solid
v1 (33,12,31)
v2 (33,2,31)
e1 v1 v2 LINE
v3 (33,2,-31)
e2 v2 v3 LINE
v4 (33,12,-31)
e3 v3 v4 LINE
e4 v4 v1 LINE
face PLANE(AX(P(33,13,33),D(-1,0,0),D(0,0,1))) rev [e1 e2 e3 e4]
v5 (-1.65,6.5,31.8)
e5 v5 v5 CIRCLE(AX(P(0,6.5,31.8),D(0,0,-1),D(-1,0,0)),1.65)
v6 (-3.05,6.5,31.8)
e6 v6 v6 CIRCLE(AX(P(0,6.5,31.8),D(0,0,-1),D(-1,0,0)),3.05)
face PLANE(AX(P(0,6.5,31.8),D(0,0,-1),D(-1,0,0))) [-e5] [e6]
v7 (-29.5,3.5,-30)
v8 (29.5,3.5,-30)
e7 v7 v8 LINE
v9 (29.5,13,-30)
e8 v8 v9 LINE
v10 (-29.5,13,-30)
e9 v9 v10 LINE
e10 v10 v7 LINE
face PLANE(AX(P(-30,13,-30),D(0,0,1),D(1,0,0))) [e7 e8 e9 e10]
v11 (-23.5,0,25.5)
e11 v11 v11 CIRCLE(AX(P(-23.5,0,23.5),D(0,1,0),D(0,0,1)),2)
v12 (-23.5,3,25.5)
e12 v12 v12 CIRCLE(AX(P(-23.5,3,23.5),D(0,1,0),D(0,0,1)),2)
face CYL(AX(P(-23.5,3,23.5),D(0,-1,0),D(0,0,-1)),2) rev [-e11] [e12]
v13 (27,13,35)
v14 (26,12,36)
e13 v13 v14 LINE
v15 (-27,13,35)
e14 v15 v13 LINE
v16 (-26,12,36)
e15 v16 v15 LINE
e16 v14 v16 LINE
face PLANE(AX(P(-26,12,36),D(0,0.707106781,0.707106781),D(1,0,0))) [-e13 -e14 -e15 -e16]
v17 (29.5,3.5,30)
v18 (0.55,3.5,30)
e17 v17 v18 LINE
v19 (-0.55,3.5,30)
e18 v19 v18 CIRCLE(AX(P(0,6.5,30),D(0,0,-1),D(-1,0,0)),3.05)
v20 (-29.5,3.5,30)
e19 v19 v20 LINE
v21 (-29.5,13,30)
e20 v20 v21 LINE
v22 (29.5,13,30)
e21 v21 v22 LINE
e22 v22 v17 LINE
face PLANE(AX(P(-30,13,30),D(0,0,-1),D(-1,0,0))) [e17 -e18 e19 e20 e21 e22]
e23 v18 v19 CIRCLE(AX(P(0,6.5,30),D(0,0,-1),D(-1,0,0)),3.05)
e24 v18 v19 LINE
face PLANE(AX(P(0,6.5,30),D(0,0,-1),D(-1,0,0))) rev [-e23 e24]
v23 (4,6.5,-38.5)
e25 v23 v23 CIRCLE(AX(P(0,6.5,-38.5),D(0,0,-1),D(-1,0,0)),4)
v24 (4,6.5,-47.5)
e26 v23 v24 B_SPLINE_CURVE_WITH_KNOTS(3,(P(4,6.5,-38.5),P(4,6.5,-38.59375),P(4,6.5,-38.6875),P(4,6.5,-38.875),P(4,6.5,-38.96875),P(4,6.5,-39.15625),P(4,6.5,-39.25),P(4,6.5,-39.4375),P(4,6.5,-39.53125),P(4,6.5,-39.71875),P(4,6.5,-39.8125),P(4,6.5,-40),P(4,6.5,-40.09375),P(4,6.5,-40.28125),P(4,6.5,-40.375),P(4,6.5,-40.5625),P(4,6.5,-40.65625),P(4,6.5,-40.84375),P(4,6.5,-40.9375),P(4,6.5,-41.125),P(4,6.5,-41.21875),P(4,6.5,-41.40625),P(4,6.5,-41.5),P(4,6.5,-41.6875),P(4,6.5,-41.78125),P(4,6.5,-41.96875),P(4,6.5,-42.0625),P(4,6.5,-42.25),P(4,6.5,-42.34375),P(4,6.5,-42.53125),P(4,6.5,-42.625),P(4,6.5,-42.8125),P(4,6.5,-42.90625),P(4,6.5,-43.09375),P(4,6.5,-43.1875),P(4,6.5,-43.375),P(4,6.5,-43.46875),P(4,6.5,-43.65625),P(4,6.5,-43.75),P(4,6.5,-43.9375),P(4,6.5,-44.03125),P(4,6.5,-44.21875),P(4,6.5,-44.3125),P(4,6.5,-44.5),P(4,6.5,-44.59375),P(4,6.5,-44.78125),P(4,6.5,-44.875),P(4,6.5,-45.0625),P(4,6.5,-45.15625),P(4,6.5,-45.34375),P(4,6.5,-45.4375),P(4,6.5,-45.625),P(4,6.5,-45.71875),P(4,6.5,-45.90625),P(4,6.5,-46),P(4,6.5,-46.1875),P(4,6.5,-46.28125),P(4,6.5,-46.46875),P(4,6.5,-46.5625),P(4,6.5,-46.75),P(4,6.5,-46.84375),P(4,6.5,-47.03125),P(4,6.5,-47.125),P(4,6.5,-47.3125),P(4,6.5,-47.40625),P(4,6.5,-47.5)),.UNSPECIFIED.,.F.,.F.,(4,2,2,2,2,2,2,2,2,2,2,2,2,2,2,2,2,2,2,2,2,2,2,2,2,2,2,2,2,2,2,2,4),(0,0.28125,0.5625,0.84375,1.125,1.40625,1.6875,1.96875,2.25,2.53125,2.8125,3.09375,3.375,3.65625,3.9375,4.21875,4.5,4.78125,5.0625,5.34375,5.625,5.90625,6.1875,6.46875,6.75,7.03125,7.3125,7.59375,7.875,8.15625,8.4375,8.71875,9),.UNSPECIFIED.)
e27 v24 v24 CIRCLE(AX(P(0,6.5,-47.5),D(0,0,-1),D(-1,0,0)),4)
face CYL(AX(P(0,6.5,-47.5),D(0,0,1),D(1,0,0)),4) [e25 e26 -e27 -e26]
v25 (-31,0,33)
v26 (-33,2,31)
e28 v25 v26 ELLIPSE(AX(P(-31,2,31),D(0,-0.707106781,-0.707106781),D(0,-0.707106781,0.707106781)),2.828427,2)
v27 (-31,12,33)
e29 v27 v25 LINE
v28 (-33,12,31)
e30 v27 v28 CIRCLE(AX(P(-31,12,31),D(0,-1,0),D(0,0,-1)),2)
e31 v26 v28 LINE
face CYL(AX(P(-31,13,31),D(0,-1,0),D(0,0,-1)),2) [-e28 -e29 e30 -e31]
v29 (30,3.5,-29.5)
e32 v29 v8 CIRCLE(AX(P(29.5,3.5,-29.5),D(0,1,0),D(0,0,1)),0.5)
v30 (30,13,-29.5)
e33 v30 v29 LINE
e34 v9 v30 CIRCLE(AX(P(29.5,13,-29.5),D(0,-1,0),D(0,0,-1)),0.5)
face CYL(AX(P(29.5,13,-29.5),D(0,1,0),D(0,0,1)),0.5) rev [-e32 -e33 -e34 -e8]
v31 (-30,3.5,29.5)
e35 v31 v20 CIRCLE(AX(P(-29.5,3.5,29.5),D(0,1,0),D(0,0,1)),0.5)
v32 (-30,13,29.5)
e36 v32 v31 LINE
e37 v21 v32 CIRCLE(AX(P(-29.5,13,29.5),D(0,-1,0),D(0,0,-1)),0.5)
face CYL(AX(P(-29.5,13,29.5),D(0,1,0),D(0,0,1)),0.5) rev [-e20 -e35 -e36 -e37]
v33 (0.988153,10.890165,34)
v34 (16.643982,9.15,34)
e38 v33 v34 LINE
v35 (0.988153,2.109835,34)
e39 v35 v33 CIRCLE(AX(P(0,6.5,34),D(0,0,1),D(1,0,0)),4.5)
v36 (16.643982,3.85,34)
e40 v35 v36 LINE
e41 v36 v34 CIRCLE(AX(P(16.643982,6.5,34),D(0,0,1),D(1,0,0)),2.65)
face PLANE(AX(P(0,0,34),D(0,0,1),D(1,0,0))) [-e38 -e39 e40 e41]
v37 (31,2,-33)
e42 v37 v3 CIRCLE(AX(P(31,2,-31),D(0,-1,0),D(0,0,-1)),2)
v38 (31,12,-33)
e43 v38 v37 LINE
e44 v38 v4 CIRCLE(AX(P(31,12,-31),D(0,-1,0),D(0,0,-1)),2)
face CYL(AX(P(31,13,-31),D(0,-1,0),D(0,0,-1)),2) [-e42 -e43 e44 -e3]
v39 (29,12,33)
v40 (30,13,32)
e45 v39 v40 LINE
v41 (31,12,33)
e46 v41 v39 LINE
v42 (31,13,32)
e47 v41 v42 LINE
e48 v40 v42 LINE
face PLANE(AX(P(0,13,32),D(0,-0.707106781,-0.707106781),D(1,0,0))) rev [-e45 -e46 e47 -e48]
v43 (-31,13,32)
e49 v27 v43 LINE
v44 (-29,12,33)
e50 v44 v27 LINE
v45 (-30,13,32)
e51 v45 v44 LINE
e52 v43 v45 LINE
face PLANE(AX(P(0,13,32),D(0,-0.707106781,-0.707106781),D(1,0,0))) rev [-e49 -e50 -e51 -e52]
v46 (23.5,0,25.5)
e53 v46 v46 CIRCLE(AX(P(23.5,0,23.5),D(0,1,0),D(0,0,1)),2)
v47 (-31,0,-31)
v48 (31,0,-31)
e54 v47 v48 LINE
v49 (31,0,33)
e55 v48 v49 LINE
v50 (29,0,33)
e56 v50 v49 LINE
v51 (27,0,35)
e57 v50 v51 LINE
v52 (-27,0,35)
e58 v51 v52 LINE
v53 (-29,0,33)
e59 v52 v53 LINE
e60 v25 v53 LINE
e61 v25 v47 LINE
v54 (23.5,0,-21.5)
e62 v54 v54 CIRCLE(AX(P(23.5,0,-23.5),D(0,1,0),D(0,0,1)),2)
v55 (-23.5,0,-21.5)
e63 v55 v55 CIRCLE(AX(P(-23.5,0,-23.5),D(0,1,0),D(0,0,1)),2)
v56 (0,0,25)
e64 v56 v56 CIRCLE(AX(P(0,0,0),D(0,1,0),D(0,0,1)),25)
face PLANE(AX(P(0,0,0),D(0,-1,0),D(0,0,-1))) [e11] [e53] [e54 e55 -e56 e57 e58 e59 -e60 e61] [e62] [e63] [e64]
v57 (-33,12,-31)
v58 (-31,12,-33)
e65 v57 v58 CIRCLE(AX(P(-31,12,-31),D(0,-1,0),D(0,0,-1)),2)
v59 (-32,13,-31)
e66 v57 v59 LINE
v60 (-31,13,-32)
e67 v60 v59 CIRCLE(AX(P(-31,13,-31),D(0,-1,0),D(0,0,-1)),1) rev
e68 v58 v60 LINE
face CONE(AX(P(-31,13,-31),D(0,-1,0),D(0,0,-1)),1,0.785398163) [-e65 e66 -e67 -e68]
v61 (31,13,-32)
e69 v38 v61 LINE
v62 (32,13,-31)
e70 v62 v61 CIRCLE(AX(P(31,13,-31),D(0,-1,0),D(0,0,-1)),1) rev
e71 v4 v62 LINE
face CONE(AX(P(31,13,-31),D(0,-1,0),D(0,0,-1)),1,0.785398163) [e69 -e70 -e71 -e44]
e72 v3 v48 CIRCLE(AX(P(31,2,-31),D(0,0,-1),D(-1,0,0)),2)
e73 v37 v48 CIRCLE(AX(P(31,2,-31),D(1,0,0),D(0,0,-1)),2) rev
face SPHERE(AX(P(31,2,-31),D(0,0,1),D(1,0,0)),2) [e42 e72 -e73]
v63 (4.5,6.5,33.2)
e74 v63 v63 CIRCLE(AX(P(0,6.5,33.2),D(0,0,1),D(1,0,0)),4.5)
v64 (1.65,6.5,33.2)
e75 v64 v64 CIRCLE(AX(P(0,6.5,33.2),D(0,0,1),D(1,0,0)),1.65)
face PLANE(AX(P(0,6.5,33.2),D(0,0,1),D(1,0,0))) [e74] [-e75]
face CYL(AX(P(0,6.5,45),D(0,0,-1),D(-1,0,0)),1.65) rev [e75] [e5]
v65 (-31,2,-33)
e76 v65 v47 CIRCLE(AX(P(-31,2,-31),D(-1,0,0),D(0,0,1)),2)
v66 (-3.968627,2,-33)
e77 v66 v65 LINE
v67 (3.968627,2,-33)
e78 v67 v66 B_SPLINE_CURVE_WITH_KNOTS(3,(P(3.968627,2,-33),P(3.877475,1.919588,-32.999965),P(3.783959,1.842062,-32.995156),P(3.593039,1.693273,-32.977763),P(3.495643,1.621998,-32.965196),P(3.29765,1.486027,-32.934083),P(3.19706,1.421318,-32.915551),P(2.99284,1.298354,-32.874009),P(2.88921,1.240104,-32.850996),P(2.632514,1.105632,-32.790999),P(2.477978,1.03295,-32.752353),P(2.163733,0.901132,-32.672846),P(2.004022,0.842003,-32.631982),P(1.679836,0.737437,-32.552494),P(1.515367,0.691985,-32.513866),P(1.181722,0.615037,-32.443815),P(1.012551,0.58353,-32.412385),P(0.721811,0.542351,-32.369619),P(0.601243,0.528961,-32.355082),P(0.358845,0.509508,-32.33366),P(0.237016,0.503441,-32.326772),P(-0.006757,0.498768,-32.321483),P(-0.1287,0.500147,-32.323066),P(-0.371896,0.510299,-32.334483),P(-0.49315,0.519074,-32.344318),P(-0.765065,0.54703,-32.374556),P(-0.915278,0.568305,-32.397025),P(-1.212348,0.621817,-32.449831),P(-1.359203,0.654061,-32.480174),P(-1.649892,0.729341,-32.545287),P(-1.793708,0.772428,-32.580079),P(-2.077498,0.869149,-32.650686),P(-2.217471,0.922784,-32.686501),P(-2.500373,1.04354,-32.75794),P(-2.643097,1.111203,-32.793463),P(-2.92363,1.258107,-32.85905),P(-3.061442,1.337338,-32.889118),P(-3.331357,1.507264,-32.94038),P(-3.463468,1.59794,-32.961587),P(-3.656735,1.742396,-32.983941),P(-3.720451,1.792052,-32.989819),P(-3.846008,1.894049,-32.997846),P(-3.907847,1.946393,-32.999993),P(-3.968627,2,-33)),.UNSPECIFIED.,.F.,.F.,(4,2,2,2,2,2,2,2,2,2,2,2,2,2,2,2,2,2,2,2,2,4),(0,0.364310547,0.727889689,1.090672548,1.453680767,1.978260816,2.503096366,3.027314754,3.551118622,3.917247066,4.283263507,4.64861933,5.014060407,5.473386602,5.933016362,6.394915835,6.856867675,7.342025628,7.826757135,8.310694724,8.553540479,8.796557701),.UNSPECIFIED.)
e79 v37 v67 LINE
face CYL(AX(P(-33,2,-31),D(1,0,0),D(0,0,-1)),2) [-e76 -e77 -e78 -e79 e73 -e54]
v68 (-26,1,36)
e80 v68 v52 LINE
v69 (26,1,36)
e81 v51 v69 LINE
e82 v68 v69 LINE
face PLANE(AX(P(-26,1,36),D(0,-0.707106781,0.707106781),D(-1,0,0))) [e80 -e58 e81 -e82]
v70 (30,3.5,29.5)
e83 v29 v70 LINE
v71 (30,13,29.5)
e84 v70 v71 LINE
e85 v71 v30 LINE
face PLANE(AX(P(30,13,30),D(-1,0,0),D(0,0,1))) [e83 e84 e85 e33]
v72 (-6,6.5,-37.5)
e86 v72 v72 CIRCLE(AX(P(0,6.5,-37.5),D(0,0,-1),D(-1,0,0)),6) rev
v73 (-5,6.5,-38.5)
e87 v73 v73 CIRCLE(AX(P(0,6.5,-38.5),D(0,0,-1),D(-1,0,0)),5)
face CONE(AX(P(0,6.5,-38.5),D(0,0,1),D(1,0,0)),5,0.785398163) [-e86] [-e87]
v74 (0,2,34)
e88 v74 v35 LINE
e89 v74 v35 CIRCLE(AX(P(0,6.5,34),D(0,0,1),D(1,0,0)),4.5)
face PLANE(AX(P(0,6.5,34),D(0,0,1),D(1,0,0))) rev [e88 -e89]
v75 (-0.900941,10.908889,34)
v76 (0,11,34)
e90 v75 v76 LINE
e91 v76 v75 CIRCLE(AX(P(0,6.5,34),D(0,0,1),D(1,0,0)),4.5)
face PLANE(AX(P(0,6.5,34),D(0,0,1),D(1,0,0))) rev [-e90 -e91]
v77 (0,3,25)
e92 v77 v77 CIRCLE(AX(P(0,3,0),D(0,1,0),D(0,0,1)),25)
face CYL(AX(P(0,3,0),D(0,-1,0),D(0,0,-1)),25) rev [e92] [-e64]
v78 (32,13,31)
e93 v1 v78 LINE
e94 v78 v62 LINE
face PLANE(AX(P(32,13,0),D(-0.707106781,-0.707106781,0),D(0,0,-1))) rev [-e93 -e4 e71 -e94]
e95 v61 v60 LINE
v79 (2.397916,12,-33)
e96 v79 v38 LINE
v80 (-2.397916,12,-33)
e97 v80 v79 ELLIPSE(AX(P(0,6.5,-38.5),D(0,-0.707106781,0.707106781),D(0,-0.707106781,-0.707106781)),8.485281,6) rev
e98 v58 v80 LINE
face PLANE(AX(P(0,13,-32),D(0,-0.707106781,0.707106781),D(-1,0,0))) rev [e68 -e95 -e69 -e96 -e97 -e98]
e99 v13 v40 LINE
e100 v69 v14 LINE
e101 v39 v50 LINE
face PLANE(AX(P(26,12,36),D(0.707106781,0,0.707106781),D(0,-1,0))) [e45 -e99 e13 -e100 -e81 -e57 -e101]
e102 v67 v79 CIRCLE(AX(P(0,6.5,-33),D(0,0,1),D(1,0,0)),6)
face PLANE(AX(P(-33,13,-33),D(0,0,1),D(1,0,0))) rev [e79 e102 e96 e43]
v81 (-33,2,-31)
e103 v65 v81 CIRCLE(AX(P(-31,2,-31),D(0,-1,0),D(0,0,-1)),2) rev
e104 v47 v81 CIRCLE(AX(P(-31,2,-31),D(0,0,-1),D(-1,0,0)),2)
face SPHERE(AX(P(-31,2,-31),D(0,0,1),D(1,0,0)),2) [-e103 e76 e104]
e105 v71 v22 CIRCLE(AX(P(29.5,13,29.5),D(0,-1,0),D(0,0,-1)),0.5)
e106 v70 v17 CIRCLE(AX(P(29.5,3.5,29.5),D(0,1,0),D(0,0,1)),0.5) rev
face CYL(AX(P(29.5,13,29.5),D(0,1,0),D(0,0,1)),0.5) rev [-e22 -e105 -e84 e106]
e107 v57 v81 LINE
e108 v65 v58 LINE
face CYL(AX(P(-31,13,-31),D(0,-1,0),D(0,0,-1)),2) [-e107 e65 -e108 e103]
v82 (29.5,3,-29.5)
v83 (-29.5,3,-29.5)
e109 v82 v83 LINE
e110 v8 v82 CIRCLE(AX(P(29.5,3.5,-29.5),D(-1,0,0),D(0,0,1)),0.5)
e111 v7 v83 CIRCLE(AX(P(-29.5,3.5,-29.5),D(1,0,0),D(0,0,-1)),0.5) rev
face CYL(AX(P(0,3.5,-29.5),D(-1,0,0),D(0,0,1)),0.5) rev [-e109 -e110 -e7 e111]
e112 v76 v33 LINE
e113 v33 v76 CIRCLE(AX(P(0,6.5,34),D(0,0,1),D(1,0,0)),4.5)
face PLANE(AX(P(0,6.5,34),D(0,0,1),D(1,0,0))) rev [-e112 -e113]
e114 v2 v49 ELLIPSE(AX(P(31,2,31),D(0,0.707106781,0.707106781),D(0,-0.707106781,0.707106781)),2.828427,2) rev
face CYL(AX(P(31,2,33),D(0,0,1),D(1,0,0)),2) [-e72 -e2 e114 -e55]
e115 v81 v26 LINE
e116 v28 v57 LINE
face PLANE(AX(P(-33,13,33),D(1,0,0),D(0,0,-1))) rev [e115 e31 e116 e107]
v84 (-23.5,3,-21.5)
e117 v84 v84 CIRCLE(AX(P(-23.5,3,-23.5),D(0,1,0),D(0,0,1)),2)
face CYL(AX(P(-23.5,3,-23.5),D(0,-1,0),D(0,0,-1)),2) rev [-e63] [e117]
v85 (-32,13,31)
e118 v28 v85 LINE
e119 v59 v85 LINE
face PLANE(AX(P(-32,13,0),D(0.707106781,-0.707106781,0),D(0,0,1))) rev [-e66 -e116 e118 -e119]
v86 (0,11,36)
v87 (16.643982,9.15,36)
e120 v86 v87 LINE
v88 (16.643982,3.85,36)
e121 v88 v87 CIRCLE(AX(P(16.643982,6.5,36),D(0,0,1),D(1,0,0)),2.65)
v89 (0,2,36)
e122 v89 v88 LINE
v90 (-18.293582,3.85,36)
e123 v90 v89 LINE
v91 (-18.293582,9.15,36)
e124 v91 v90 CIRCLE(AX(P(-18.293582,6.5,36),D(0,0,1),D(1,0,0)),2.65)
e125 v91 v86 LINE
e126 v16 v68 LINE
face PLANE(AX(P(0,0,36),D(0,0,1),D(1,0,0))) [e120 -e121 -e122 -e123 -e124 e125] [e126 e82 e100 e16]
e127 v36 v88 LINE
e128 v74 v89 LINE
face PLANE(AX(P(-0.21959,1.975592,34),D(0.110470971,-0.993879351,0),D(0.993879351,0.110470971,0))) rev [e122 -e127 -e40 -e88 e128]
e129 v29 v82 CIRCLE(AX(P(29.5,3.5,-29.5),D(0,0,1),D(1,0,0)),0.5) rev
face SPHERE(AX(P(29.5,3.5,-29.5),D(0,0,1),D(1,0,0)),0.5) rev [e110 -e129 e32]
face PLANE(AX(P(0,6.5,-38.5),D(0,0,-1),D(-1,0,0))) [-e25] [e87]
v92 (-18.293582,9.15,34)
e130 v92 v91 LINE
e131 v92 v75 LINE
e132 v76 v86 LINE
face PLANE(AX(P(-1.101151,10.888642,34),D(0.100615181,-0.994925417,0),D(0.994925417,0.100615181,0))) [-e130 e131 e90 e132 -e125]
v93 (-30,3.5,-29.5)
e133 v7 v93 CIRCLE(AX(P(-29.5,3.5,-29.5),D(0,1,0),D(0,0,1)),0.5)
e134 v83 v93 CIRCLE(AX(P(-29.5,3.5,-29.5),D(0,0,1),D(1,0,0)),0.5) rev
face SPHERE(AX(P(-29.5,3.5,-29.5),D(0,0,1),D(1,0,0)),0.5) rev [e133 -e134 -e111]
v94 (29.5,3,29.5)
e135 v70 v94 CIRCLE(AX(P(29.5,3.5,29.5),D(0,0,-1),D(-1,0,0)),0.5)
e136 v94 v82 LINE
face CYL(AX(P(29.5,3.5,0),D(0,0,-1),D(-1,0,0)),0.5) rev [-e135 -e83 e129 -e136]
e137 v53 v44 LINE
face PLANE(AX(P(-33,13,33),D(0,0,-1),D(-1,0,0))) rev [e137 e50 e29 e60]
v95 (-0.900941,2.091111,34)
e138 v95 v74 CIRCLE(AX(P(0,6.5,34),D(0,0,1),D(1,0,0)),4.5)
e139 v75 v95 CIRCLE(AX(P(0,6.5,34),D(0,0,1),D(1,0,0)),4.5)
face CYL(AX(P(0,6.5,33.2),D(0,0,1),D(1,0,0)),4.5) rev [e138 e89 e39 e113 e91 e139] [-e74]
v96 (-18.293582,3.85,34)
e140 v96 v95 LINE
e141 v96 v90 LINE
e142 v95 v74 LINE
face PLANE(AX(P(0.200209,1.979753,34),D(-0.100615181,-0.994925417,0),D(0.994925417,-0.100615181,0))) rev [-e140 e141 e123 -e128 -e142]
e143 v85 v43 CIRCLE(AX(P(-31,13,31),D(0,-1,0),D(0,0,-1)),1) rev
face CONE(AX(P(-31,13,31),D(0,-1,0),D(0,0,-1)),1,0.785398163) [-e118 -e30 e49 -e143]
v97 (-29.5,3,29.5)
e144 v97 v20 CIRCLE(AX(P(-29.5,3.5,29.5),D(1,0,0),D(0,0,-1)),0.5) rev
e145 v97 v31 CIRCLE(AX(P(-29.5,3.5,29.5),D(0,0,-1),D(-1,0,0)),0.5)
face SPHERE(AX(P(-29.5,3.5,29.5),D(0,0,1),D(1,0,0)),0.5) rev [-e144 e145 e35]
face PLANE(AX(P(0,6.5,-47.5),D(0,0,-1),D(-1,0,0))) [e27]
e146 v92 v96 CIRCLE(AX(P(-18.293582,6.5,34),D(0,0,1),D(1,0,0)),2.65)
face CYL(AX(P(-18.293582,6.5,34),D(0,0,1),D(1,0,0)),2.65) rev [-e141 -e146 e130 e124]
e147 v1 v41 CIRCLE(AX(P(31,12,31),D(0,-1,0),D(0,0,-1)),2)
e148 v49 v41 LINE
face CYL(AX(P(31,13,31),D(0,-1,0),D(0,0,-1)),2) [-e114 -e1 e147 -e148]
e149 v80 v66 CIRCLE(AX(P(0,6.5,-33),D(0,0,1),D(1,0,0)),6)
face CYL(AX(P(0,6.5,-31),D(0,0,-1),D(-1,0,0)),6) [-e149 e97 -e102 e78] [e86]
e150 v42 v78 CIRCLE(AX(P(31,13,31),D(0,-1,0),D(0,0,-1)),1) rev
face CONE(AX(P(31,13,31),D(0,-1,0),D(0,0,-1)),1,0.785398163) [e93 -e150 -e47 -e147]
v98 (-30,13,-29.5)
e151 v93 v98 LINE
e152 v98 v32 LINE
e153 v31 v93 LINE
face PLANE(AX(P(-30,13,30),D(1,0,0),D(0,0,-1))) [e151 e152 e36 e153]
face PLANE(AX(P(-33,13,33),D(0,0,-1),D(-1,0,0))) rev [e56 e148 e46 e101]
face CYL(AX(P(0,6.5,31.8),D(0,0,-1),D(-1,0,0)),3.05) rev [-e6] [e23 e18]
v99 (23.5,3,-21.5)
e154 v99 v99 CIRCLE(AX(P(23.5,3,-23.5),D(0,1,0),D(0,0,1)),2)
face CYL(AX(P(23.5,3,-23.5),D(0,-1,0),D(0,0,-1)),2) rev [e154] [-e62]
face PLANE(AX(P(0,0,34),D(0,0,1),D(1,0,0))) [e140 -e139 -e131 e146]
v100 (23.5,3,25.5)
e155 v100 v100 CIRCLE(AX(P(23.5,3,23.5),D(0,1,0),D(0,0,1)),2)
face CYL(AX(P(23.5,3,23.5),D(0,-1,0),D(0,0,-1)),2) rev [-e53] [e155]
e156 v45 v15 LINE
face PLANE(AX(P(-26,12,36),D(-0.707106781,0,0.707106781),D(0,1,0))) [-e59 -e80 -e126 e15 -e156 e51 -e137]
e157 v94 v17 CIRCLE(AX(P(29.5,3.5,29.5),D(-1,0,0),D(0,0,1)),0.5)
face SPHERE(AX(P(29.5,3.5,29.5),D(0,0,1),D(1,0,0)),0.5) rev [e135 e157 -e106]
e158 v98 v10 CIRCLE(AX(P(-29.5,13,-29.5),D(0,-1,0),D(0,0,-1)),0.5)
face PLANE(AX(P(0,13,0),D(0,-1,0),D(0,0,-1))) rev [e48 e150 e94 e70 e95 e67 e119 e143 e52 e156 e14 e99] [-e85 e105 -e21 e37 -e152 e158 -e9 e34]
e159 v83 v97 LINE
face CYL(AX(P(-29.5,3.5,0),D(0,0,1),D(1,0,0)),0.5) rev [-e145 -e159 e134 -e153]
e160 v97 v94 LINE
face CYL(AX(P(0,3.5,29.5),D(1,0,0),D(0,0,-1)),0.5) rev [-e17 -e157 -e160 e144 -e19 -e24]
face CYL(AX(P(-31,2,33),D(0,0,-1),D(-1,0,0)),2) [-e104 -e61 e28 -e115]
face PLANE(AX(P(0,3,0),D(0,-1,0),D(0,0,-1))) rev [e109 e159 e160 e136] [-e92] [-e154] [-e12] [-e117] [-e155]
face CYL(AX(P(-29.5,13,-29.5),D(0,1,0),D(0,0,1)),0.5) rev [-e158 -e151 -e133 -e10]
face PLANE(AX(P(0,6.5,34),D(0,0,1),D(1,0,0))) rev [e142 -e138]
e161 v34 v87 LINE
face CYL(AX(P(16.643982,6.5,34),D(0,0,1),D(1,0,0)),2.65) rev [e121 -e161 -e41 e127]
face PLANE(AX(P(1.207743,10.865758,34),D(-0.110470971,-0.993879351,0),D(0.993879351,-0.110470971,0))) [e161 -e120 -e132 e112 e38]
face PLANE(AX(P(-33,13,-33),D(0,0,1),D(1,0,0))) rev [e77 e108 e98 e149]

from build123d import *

# Parameters (mm, degrees)
SKETCH1_W                = 66
SKETCH1_H                = 66
SKETCH1_W_2              = 60
SKETCH1_H_2              = 60
BOSS_EXTRUDE1_DEPTH      = 13
SKETCH2_W                = 60
SKETCH2_H                = 60
SKETCH2_R                = 25
SKETCH2_R_2              = 2
BOSS_EXTRUDE2_DEPTH      = 3
FILLET1_R                = 0.5
FILLET2_R                = 2
SKETCH12_W               = 52
SKETCH12_H               = 11
BOSS_EXTRUDE3_DEPTH      = 3
CHAMFER1_SIZE            = 3
CUT_EXTRUDE4_DEPTH       = 12
CUT_EXTRUDE4_DEPTH_BACK  = 12
SKETCH10_R               = 1.65
SKETCH13_R               = 3.05
CUT_EXTRUDE6_DEPTH       = 1.8
SKETCH14_R               = 4
BOSS_EXTRUDE4_DEPTH      = 14.5
BOSS_EXTRUDE5_DEPTH      = 5.5
BOSS_EXTRUDE5_DEPTH_BACK = 2
SKETCH15_R               = 6
CHAMFER2_SIZE            = 1
CHAMFER3_SIZE            = 1
SKETCH17_R               = 2.65
SKETCH17_R_2             = 1.65
CUT_EXTRUDE8_DEPTH       = 2
SKETCH18_R               = 4.5
CUT_EXTRUDE9_DEPTH       = 0.8


with BuildPart() as part:
    # Sketch1 → Boss-Extrude1 (new body)
    with BuildSketch(Plane(origin=(0, 0, 0), x_dir=(1, 0, 0), z_dir=(0, 1, 0))):
        Rectangle(SKETCH1_W, SKETCH1_H)
        Rectangle(SKETCH1_W_2, SKETCH1_H_2, mode=Mode.SUBTRACT)
    extrude(amount=BOSS_EXTRUDE1_DEPTH)

    # Sketch2 → Boss-Extrude2 (add)
    with BuildSketch(Plane(origin=(0, 0, 0), x_dir=(1, 0, 0), z_dir=(0, 1, 0))):
        Rectangle(SKETCH2_W, SKETCH2_H)
        with Locations(Location((0, 0, 0), (0, 0, 270))):
            Circle(SKETCH2_R, mode=Mode.SUBTRACT)
        with Locations(Location((-23.5, 23.5, 0), (0, 0, 270))):
            Circle(SKETCH2_R_2, mode=Mode.SUBTRACT)
        with Locations(Location((23.5, 23.5, 0), (0, 0, 270))):
            Circle(SKETCH2_R_2, mode=Mode.SUBTRACT)
        with Locations(Location((23.5, -23.5, 0), (0, 0, 270))):
            Circle(SKETCH2_R_2, mode=Mode.SUBTRACT)
        with Locations(Location((-23.5, -23.5, 0), (0, 0, 270))):
            Circle(SKETCH2_R_2, mode=Mode.SUBTRACT)
    extrude(amount=BOSS_EXTRUDE2_DEPTH)

    # Fillet1
    fillet1_edges = [part.edges().sort_by_distance(p)[0] for p in [
        (-30, 8, -30),
        (-30, 8, 30),
        (30, 8, 30),
        (30, 8, -30),
        (-30, 3, 0),
        (0, 3, 30),
        (30, 3, 0),
        (0, 3, -30),
    ]]
    fillet(fillet1_edges, radius=FILLET1_R)

    # Fillet2
    fillet2_edges = [part.edges().sort_by_distance(p)[0] for p in [
        (0, 0, -33),
        (33, 0, 0),
        (-33, 0, 0),
        (-33, 6.5, -33),
        (33, 6.5, -33),
        (33, 6.5, 33),
        (-33, 6.5, 33),
    ]]
    fillet(fillet2_edges, radius=FILLET2_R)

    # Sketch12 → Boss-Extrude3 (add)
    with BuildSketch(Plane.XY.offset(33)):
        with Locations((0, 6.5)):
            Rectangle(SKETCH12_W, SKETCH12_H)
    extrude(amount=BOSS_EXTRUDE3_DEPTH)

    # Chamfer1
    # the kernel refuses this chamfer: 3 mm, written as the material it adds along each edge
    with BuildSketch(Plane(origin=(26, 1, 33), x_dir=(0, -0.9996219169112968, -0.027495876610586775), z_dir=(-1, 0, 0))) as chamfer1_piece_1_section:
        Polygon((CHAMFER1_SIZE * 0.999621916911, CHAMFER1_SIZE * 0.0274958766106), (-CHAMFER1_SIZE * 0.0274958766106, CHAMFER1_SIZE * 0.999621916911), (0, 0), align=None)
    chamfer1_piece_1 = extrude(amount=52, mode=Mode.PRIVATE)
    chamfer1_piece_1 = split(chamfer1_piece_1, bisect_by=Plane(origin=(0, 0, 34.280814641), z_dir=(0, 1, 0)), keep=Keep.TOP, mode=Mode.PRIVATE)
    chamfer1_piece_1 = split(chamfer1_piece_1, bisect_by=Plane(origin=(0, 0.572987798, 36), z_dir=(0, 0, -1)), keep=Keep.TOP, mode=Mode.PRIVATE)
    add(chamfer1_piece_1)
    with BuildSketch(Plane(origin=(26, 12, 33), x_dir=(0.9996219169112965, 0, -0.02749587661058676), z_dir=(0, -1, 0))) as chamfer1_piece_2_section:
        Polygon((CHAMFER1_SIZE * 0.999621916911, CHAMFER1_SIZE * 0.0274958766106), (-CHAMFER1_SIZE * 0.0274958766106, CHAMFER1_SIZE * 0.999621916911), (0, 0), align=None)
    chamfer1_piece_2 = extrude(amount=11, mode=Mode.PRIVATE)
    chamfer1_piece_2 = split(chamfer1_piece_2, bisect_by=Plane(origin=(26.991212463, 6.5, 36), z_dir=(0, 0, -1)), keep=Keep.TOP, mode=Mode.PRIVATE)
    add(chamfer1_piece_2)
    with BuildSketch(Plane(origin=(-26, 12, 33), x_dir=(0, 0.9996219169112968, -0.02749587661058678), z_dir=(1, 0, 0))) as chamfer1_piece_3_section:
        Polygon((CHAMFER1_SIZE * 0.999621916911, CHAMFER1_SIZE * 0.0274958766106), (-CHAMFER1_SIZE * 0.0274958766106, CHAMFER1_SIZE * 0.999621916911), (0, 0), align=None)
    chamfer1_piece_3 = extrude(amount=52, mode=Mode.PRIVATE)
    chamfer1_piece_3 = split(chamfer1_piece_3, bisect_by=Plane(origin=(0, 13, 34.280814641), z_dir=(0, -1, 0)), keep=Keep.TOP, mode=Mode.PRIVATE)
    chamfer1_piece_3 = split(chamfer1_piece_3, bisect_by=Plane(origin=(0, 12.427012202, 36), z_dir=(0, 0, -1)), keep=Keep.TOP, mode=Mode.PRIVATE)
    add(chamfer1_piece_3)
    with BuildSketch(Plane(origin=(-26, 1, 33), x_dir=(-0.9996219169112965, 0, -0.02749587661058676), z_dir=(0, 1, 0))) as chamfer1_piece_4_section:
        Polygon((CHAMFER1_SIZE * 0.999621916911, CHAMFER1_SIZE * 0.0274958766106), (-CHAMFER1_SIZE * 0.0274958766106, CHAMFER1_SIZE * 0.999621916911), (0, 0), align=None)
    chamfer1_piece_4 = extrude(amount=11, mode=Mode.PRIVATE)
    chamfer1_piece_4 = split(chamfer1_piece_4, bisect_by=Plane(origin=(-26.991212463, 6.5, 36), z_dir=(0, 0, -1)), keep=Keep.TOP, mode=Mode.PRIVATE)
    add(chamfer1_piece_4)
    with BuildSketch(Plane(origin=(26, 12, 33), x_dir=(0.9996219169112965, 0, -0.02749587661058676), z_dir=(0, -1, 0))) as chamfer1_piece_5a_section:
        Polygon((CHAMFER1_SIZE * 0.999621916911, CHAMFER1_SIZE * 0.0274958766106), (-CHAMFER1_SIZE * 0.0274958766106, CHAMFER1_SIZE * 0.999621916911), (0, 0), align=None)
    chamfer1_piece_5a = extrude(amount=18.715048964, mode=Mode.PRIVATE)
    chamfer1_piece_5a = split(chamfer1_piece_5a, bisect_by=Plane(origin=(26.991212463, 0, 33.985903001), z_dir=(0, 1, 0)), keep=Keep.TOP, mode=Mode.PRIVATE)
    chamfer1_piece_5a = split(chamfer1_piece_5a, bisect_by=Plane(origin=(26.991212463, 1, 33.985903001), z_dir=(0, -1, 0)), keep=Keep.TOP, mode=Mode.PRIVATE)
    chamfer1_piece_5a = split(chamfer1_piece_5a, bisect_by=Plane(origin=(26.991212463, 0.5, 36), z_dir=(0, 0, -1)), keep=Keep.TOP, mode=Mode.PRIVATE)
    with BuildSketch(Plane(origin=(33.715048964, 1, 33), x_dir=(0, -0.9996219169112968, -0.027495876610586775), z_dir=(-1, 0, 0))) as chamfer1_piece_5b_section:
        Polygon((CHAMFER1_SIZE * 0.999621916911, CHAMFER1_SIZE * 0.0274958766106), (-CHAMFER1_SIZE * 0.0274958766106, CHAMFER1_SIZE * 0.999621916911), (0, 0), align=None)
    chamfer1_piece_5b = extrude(amount=59.715048964, mode=Mode.PRIVATE)
    chamfer1_piece_5b = split(chamfer1_piece_5b, bisect_by=Plane(origin=(29.857524482, 0, 34.280814641), z_dir=(0, 1, 0)), keep=Keep.TOP, mode=Mode.PRIVATE)
    chamfer1_piece_5b = split(chamfer1_piece_5b, bisect_by=Plane(origin=(26, 0.572987798, 34.280814641), z_dir=(1, 0, 0)), keep=Keep.TOP, mode=Mode.PRIVATE)
    chamfer1_piece_5b = split(chamfer1_piece_5b, bisect_by=Plane(origin=(29.857524482, 0.572987798, 36), z_dir=(0, 0, -1)), keep=Keep.TOP, mode=Mode.PRIVATE)
    chamfer1_piece_5 = chamfer1_piece_5a & chamfer1_piece_5b
    add(chamfer1_piece_5)
    with BuildSketch(Plane(origin=(26, 1, 33), x_dir=(0, -0.9996219169112968, -0.027495876610586775), z_dir=(-1, 0, 0))) as chamfer1_piece_6a_section:
        Polygon((CHAMFER1_SIZE * 0.999621916911, CHAMFER1_SIZE * 0.0274958766106), (-CHAMFER1_SIZE * 0.0274958766106, CHAMFER1_SIZE * 0.999621916911), (0, 0), align=None)
    chamfer1_piece_6a = extrude(amount=59.715048964, mode=Mode.PRIVATE)
    chamfer1_piece_6a = split(chamfer1_piece_6a, bisect_by=Plane(origin=(-29.857524482, 0, 34.280814641), z_dir=(0, 1, 0)), keep=Keep.TOP, mode=Mode.PRIVATE)
    chamfer1_piece_6a = split(chamfer1_piece_6a, bisect_by=Plane(origin=(-26, 0.572987798, 34.280814641), z_dir=(-1, 0, 0)), keep=Keep.TOP, mode=Mode.PRIVATE)
    chamfer1_piece_6a = split(chamfer1_piece_6a, bisect_by=Plane(origin=(-29.857524482, 0.572987798, 36), z_dir=(0, 0, -1)), keep=Keep.TOP, mode=Mode.PRIVATE)
    with BuildSketch(Plane(origin=(-26, -6.715048964, 33), x_dir=(-0.9996219169112965, 0, -0.02749587661058676), z_dir=(0, 1, 0))) as chamfer1_piece_6b_section:
        Polygon((CHAMFER1_SIZE * 0.999621916911, CHAMFER1_SIZE * 0.0274958766106), (-CHAMFER1_SIZE * 0.0274958766106, CHAMFER1_SIZE * 0.999621916911), (0, 0), align=None)
    chamfer1_piece_6b = extrude(amount=18.715048964, mode=Mode.PRIVATE)
    chamfer1_piece_6b = split(chamfer1_piece_6b, bisect_by=Plane(origin=(-26.991212463, 0, 33.985903001), z_dir=(0, 1, 0)), keep=Keep.TOP, mode=Mode.PRIVATE)
    chamfer1_piece_6b = split(chamfer1_piece_6b, bisect_by=Plane(origin=(-26.991212463, 1, 33.985903001), z_dir=(0, -1, 0)), keep=Keep.TOP, mode=Mode.PRIVATE)
    chamfer1_piece_6b = split(chamfer1_piece_6b, bisect_by=Plane(origin=(-26.991212463, 0.5, 36), z_dir=(0, 0, -1)), keep=Keep.TOP, mode=Mode.PRIVATE)
    chamfer1_piece_6 = chamfer1_piece_6a & chamfer1_piece_6b
    add(chamfer1_piece_6)
    with BuildSketch(Plane(origin=(-26, 12, 33), x_dir=(0, 0.9996219169112968, -0.02749587661058678), z_dir=(1, 0, 0))) as chamfer1_piece_7a_section:
        Polygon((CHAMFER1_SIZE * 0.999621916911, CHAMFER1_SIZE * 0.0274958766106), (-CHAMFER1_SIZE * 0.0274958766106, CHAMFER1_SIZE * 0.999621916911), (0, 0), align=None)
    chamfer1_piece_7a = extrude(amount=59.715048964, mode=Mode.PRIVATE)
    chamfer1_piece_7a = split(chamfer1_piece_7a, bisect_by=Plane(origin=(29.857524482, 13, 34.280814641), z_dir=(0, -1, 0)), keep=Keep.TOP, mode=Mode.PRIVATE)
    chamfer1_piece_7a = split(chamfer1_piece_7a, bisect_by=Plane(origin=(26, 12.427012202, 34.280814641), z_dir=(1, 0, 0)), keep=Keep.TOP, mode=Mode.PRIVATE)
    chamfer1_piece_7a = split(chamfer1_piece_7a, bisect_by=Plane(origin=(29.857524482, 12.427012202, 36), z_dir=(0, 0, -1)), keep=Keep.TOP, mode=Mode.PRIVATE)
    with BuildSketch(Plane(origin=(26, 19.715048964, 33), x_dir=(0.9996219169112965, 0, -0.02749587661058676), z_dir=(0, -1, 0))) as chamfer1_piece_7b_section:
        Polygon((CHAMFER1_SIZE * 0.999621916911, CHAMFER1_SIZE * 0.0274958766106), (-CHAMFER1_SIZE * 0.0274958766106, CHAMFER1_SIZE * 0.999621916911), (0, 0), align=None)
    chamfer1_piece_7b = extrude(amount=18.715048964, mode=Mode.PRIVATE)
    chamfer1_piece_7b = split(chamfer1_piece_7b, bisect_by=Plane(origin=(26.991212463, 13, 33.985903001), z_dir=(0, -1, 0)), keep=Keep.TOP, mode=Mode.PRIVATE)
    chamfer1_piece_7b = split(chamfer1_piece_7b, bisect_by=Plane(origin=(26.991212463, 12, 33.985903001), z_dir=(0, 1, 0)), keep=Keep.TOP, mode=Mode.PRIVATE)
    chamfer1_piece_7b = split(chamfer1_piece_7b, bisect_by=Plane(origin=(26.991212463, 12.5, 36), z_dir=(0, 0, -1)), keep=Keep.TOP, mode=Mode.PRIVATE)
    chamfer1_piece_7 = chamfer1_piece_7a & chamfer1_piece_7b
    add(chamfer1_piece_7)
    with BuildSketch(Plane(origin=(-33.715048964, 12, 33), x_dir=(0, 0.9996219169112968, -0.02749587661058678), z_dir=(1, 0, 0))) as chamfer1_piece_8a_section:
        Polygon((CHAMFER1_SIZE * 0.999621916911, CHAMFER1_SIZE * 0.0274958766106), (-CHAMFER1_SIZE * 0.0274958766106, CHAMFER1_SIZE * 0.999621916911), (0, 0), align=None)
    chamfer1_piece_8a = extrude(amount=59.715048964, mode=Mode.PRIVATE)
    chamfer1_piece_8a = split(chamfer1_piece_8a, bisect_by=Plane(origin=(-29.857524482, 13, 34.280814641), z_dir=(0, -1, 0)), keep=Keep.TOP, mode=Mode.PRIVATE)
    chamfer1_piece_8a = split(chamfer1_piece_8a, bisect_by=Plane(origin=(-26, 12.427012202, 34.280814641), z_dir=(-1, 0, 0)), keep=Keep.TOP, mode=Mode.PRIVATE)
    chamfer1_piece_8a = split(chamfer1_piece_8a, bisect_by=Plane(origin=(-29.857524482, 12.427012202, 36), z_dir=(0, 0, -1)), keep=Keep.TOP, mode=Mode.PRIVATE)
    with BuildSketch(Plane(origin=(-26, 1, 33), x_dir=(-0.9996219169112965, 0, -0.02749587661058676), z_dir=(0, 1, 0))) as chamfer1_piece_8b_section:
        Polygon((CHAMFER1_SIZE * 0.999621916911, CHAMFER1_SIZE * 0.0274958766106), (-CHAMFER1_SIZE * 0.0274958766106, CHAMFER1_SIZE * 0.999621916911), (0, 0), align=None)
    chamfer1_piece_8b = extrude(amount=18.715048964, mode=Mode.PRIVATE)
    chamfer1_piece_8b = split(chamfer1_piece_8b, bisect_by=Plane(origin=(-26.991212463, 13, 33.985903001), z_dir=(0, -1, 0)), keep=Keep.TOP, mode=Mode.PRIVATE)
    chamfer1_piece_8b = split(chamfer1_piece_8b, bisect_by=Plane(origin=(-26.991212463, 12, 33.985903001), z_dir=(0, 1, 0)), keep=Keep.TOP, mode=Mode.PRIVATE)
    chamfer1_piece_8b = split(chamfer1_piece_8b, bisect_by=Plane(origin=(-26.991212463, 12.5, 36), z_dir=(0, 0, -1)), keep=Keep.TOP, mode=Mode.PRIVATE)
    chamfer1_piece_8 = chamfer1_piece_8a & chamfer1_piece_8b
    add(chamfer1_piece_8)

    # Sketch10 → Cut-Extrude4 (cut, two sides: drawn at the far end of the back side and taken through both)
    with BuildSketch(Plane.XY.offset(33).offset(-CUT_EXTRUDE4_DEPTH_BACK)):
        with Locations(Location((0, 6.5, 0), (0, 0, 180))):
            Circle(SKETCH10_R)
    extrude(amount=CUT_EXTRUDE4_DEPTH + CUT_EXTRUDE4_DEPTH_BACK, mode=Mode.SUBTRACT)

    # Sketch13 → Cut-Extrude6 (cut)
    with BuildSketch(Plane(origin=(0, 0, 30), x_dir=(-1, 0, 0), z_dir=(0, 0, -1))):
        with Locations((0, 6.5)):
            Circle(SKETCH13_R)
    extrude(amount=-CUT_EXTRUDE6_DEPTH, mode=Mode.SUBTRACT)

    # Sketch14 → Boss-Extrude4 (add)
    with BuildSketch(Plane(origin=(0, 0, -33), x_dir=(-1, 0, 0), z_dir=(0, 0, -1))):
        with Locations(Location((0, 6.5, 0), (0, 0, 180))):
            Circle(SKETCH14_R)
    extrude(amount=BOSS_EXTRUDE4_DEPTH)

    # Sketch15 → Boss-Extrude5 (add, two sides: drawn at the far end of the back side and taken through both)
    with BuildSketch(Plane(origin=(0, 0, -33), x_dir=(-1, 0, 0), z_dir=(0, 0, -1)).offset(-BOSS_EXTRUDE5_DEPTH_BACK)):
        with Locations((0, 6.5)):
            Circle(SKETCH15_R)
    extrude(amount=BOSS_EXTRUDE5_DEPTH + BOSS_EXTRUDE5_DEPTH_BACK)

    # Chamfer2
    chamfer2_edges = [part.edges().sort_by_distance(p)[0] for p in [
        (6, 6.5, -38.5),
    ]]
    chamfer(chamfer2_edges, length=CHAMFER2_SIZE)

    # Chamfer3
    # the kernel refuses this chamfer: 1 mm, written as the material it takes off along each edge
    with BuildSketch(Plane(origin=(26.428317012, 13, 33), x_dir=(0, 0.027495876610585647, -0.9996219169112968), z_dir=(1, 0, 0))) as chamfer3_piece_1_section:
        Polygon((CHAMFER3_SIZE * 0.999621916911, -CHAMFER3_SIZE * 0.0274958766106), (-CHAMFER3_SIZE * 0.0274958766106, -CHAMFER3_SIZE * 0.999621916911), (0, 0), align=None)
    chamfer3_piece_1 = extrude(amount=4.571682988, mode=Mode.PRIVATE)
    chamfer3_piece_1 = split(chamfer3_piece_1, bisect_by=Plane(origin=(29.718829638, 12.649880303, 32.281170362), z_dir=(0.7071067811868302, 0, 0.7071067811862648)), keep=Keep.TOP, mode=Mode.PRIVATE)
    add(chamfer3_piece_1, mode=Mode.SUBTRACT)
    with BuildSketch(Plane(origin=(-33, 13, -31), x_dir=(0.9996219169112968, 0.027495876610585647, 0), z_dir=(0, 0, 1)), Plane(origin=(33, 13, 31), x_dir=(-0.9996219169112968, 0.027495876610585647, 0), z_dir=(0, 0, -1))) as chamfer3_piece_2:
        Polygon((CHAMFER3_SIZE * 0.999621916911, -CHAMFER3_SIZE * 0.0274958766106), (-CHAMFER3_SIZE * 0.0274958766106, -CHAMFER3_SIZE * 0.999621916911), (0, 0), align=None)
    extrude(amount=62, mode=Mode.SUBTRACT)
    with BuildSketch(Plane(origin=(31, 13, -33), x_dir=(0, -0.9996219169112968, -0.0274958766105891), z_dir=(-1, 0, 0))) as chamfer3_piece_3_section:
        Polygon((CHAMFER3_SIZE * 0.999621916911, CHAMFER3_SIZE * 0.0274958766106), (-CHAMFER3_SIZE * 0.0274958766106, CHAMFER3_SIZE * 0.999621916911), (0, 0), align=None)
    chamfer3_piece_3 = extrude(amount=62, mode=Mode.PRIVATE)
    chamfer3_piece_3 = chamfer3_piece_3 - Plane(origin=(0, 6.5, -32.667817894), x_dir=(-1, 0, 0), z_dir=(0, 0, 1)) * Cylinder(6, 128, mode=Mode.PRIVATE)
    add(chamfer3_piece_3, mode=Mode.SUBTRACT)
    with BuildSketch(Plane(origin=(-31, 13, 33), x_dir=(0, 0.027495876610585647, -0.9996219169112968), z_dir=(1, 0, 0))) as chamfer3_piece_4_section:
        Polygon((CHAMFER3_SIZE * 0.999621916911, -CHAMFER3_SIZE * 0.0274958766106), (-CHAMFER3_SIZE * 0.0274958766106, -CHAMFER3_SIZE * 0.999621916911), (0, 0), align=None)
    chamfer3_piece_4 = extrude(amount=4.571682988, mode=Mode.PRIVATE)
    chamfer3_piece_4 = split(chamfer3_piece_4, bisect_by=Plane(origin=(-29.718829638, 12.649880303, 32.281170362), z_dir=(-0.7071067811868302, 0, 0.7071067811862648)), keep=Keep.TOP, mode=Mode.PRIVATE)
    add(chamfer3_piece_4, mode=Mode.SUBTRACT)
    with BuildSketch(Plane(origin=(31, 13, -31), x_dir=(1, 0, 0), z_dir=(0, 0, 1))) as chamfer3_piece_5:
        Polygon((2, -CHAMFER3_SIZE), (2 - CHAMFER3_SIZE, 0), (2, 0), align=None)
    revolve(axis=Axis((31, 13, -31), (0, 1, 0)), revolution_arc=90, mode=Mode.SUBTRACT)
    with BuildSketch(Plane(origin=(31, 13, 31), x_dir=(0, 0, 1), z_dir=(-1, 0, 0))) as chamfer3_piece_6:
        Polygon((2 - CHAMFER3_SIZE, 0), (2, -CHAMFER3_SIZE), (2, 0), align=None)
    revolve(axis=Axis((31, 13, 31), (0, 1, 0)), revolution_arc=90, mode=Mode.SUBTRACT)
    with BuildSketch(Plane(origin=(-31, 13, 31), x_dir=(0, 0, 1), z_dir=(1, 0, 0))) as chamfer3_piece_7:
        Polygon((2 - CHAMFER3_SIZE, 0), (2, CHAMFER3_SIZE), (2, 0), align=None)
    revolve(axis=Axis((-31, 13, 31), (0, -1, 0)), revolution_arc=90, mode=Mode.SUBTRACT)
    with BuildSketch(Plane(origin=(-31, 13, -31), x_dir=(0, 0, -1), z_dir=(1, 0, 0))) as chamfer3_piece_8:
        Polygon((2, -CHAMFER3_SIZE), (2 - CHAMFER3_SIZE, 0), (2, 0), align=None)
    revolve(axis=Axis((-31, 13, -31), (0, 1, 0)), revolution_arc=90, mode=Mode.SUBTRACT)

    # Sketch17 → Cut-Extrude8 (cut)
    # profile 1 of 5: a face of its own
    with BuildSketch(Plane.XY.offset(36)):
        with Locations((-18.293581625, 6.5)):
            Circle(SKETCH17_R)
    # profile 2 of 5: a face of its own
    with BuildSketch(Plane.XY.offset(36)):
        with BuildLine():
            Line((-0.900941406, 10.908889269), (-18.293581625, 9.15))
            ThreePointArc((-18.293581625, 9.15), (-16.419748655, 8.37383297), (-15.643581625, 6.5))
            ThreePointArc((-15.643581625, 6.5), (-16.419748655, 4.62616703), (-18.293581625, 3.85))
            Line((-18.293581625, 3.85), (-0.900941406, 2.091110731))
            ThreePointArc((-0.900941406, 2.091110731), (-4.5, 6.5), (-0.900941406, 10.908889269))
        make_face()
    # profile 3 of 5: a face of its own
    with BuildSketch(Plane.XY.offset(36)):
        with BuildLine():
            Line((0, 11), (-0.900941406, 10.908889269))
            ThreePointArc((-0.900941406, 10.908889269), (-4.5, 6.5), (-0.900941406, 2.091110731))
            Line((-0.900941406, 2.091110731), (0, 2))
            Line((0, 2), (0.98815335, 2.109834518))
            ThreePointArc((0.98815335, 2.109834518), (3.514021206, 3.689011746), (4.5, 6.5))
            ThreePointArc((4.5, 6.5), (3.514021206, 9.310988254), (0.98815335, 10.890165482))
            Line((0.98815335, 10.890165482), (0, 11))
        make_face()
        with Locations(Location((0, 6.5, 0), (0, 0, 180))):
            Circle(SKETCH17_R_2, mode=Mode.SUBTRACT)
    # profile 4 of 5: a face of its own
    with BuildSketch(Plane.XY.offset(36)):
        with BuildLine():
            Line((16.643981564, 9.15), (0.98815335, 10.890165482))
            ThreePointArc((0.98815335, 10.890165482), (3.514021206, 9.310988254), (4.5, 6.5))
            ThreePointArc((4.5, 6.5), (3.514021206, 3.689011746), (0.98815335, 2.109834518))
            Line((0.98815335, 2.109834518), (16.643981564, 3.85))
            ThreePointArc((16.643981564, 3.85), (13.993981564, 6.5), (16.643981564, 9.15))
        make_face()
    # profile 5 of 5: a face of its own
    with BuildSketch(Plane.XY.offset(36)):
        with Locations((16.643981564, 6.5)):
            Circle(SKETCH17_R)
    extrude(amount=-CUT_EXTRUDE8_DEPTH, mode=Mode.SUBTRACT)

    # Sketch18 → Cut-Extrude9 (cut)
    with BuildSketch(Plane.XY.offset(34)):
        with Locations((0, 6.5)):
            Circle(SKETCH18_R)
    extrude(amount=-CUT_EXTRUDE9_DEPTH, mode=Mode.SUBTRACT)


solid = part.part
